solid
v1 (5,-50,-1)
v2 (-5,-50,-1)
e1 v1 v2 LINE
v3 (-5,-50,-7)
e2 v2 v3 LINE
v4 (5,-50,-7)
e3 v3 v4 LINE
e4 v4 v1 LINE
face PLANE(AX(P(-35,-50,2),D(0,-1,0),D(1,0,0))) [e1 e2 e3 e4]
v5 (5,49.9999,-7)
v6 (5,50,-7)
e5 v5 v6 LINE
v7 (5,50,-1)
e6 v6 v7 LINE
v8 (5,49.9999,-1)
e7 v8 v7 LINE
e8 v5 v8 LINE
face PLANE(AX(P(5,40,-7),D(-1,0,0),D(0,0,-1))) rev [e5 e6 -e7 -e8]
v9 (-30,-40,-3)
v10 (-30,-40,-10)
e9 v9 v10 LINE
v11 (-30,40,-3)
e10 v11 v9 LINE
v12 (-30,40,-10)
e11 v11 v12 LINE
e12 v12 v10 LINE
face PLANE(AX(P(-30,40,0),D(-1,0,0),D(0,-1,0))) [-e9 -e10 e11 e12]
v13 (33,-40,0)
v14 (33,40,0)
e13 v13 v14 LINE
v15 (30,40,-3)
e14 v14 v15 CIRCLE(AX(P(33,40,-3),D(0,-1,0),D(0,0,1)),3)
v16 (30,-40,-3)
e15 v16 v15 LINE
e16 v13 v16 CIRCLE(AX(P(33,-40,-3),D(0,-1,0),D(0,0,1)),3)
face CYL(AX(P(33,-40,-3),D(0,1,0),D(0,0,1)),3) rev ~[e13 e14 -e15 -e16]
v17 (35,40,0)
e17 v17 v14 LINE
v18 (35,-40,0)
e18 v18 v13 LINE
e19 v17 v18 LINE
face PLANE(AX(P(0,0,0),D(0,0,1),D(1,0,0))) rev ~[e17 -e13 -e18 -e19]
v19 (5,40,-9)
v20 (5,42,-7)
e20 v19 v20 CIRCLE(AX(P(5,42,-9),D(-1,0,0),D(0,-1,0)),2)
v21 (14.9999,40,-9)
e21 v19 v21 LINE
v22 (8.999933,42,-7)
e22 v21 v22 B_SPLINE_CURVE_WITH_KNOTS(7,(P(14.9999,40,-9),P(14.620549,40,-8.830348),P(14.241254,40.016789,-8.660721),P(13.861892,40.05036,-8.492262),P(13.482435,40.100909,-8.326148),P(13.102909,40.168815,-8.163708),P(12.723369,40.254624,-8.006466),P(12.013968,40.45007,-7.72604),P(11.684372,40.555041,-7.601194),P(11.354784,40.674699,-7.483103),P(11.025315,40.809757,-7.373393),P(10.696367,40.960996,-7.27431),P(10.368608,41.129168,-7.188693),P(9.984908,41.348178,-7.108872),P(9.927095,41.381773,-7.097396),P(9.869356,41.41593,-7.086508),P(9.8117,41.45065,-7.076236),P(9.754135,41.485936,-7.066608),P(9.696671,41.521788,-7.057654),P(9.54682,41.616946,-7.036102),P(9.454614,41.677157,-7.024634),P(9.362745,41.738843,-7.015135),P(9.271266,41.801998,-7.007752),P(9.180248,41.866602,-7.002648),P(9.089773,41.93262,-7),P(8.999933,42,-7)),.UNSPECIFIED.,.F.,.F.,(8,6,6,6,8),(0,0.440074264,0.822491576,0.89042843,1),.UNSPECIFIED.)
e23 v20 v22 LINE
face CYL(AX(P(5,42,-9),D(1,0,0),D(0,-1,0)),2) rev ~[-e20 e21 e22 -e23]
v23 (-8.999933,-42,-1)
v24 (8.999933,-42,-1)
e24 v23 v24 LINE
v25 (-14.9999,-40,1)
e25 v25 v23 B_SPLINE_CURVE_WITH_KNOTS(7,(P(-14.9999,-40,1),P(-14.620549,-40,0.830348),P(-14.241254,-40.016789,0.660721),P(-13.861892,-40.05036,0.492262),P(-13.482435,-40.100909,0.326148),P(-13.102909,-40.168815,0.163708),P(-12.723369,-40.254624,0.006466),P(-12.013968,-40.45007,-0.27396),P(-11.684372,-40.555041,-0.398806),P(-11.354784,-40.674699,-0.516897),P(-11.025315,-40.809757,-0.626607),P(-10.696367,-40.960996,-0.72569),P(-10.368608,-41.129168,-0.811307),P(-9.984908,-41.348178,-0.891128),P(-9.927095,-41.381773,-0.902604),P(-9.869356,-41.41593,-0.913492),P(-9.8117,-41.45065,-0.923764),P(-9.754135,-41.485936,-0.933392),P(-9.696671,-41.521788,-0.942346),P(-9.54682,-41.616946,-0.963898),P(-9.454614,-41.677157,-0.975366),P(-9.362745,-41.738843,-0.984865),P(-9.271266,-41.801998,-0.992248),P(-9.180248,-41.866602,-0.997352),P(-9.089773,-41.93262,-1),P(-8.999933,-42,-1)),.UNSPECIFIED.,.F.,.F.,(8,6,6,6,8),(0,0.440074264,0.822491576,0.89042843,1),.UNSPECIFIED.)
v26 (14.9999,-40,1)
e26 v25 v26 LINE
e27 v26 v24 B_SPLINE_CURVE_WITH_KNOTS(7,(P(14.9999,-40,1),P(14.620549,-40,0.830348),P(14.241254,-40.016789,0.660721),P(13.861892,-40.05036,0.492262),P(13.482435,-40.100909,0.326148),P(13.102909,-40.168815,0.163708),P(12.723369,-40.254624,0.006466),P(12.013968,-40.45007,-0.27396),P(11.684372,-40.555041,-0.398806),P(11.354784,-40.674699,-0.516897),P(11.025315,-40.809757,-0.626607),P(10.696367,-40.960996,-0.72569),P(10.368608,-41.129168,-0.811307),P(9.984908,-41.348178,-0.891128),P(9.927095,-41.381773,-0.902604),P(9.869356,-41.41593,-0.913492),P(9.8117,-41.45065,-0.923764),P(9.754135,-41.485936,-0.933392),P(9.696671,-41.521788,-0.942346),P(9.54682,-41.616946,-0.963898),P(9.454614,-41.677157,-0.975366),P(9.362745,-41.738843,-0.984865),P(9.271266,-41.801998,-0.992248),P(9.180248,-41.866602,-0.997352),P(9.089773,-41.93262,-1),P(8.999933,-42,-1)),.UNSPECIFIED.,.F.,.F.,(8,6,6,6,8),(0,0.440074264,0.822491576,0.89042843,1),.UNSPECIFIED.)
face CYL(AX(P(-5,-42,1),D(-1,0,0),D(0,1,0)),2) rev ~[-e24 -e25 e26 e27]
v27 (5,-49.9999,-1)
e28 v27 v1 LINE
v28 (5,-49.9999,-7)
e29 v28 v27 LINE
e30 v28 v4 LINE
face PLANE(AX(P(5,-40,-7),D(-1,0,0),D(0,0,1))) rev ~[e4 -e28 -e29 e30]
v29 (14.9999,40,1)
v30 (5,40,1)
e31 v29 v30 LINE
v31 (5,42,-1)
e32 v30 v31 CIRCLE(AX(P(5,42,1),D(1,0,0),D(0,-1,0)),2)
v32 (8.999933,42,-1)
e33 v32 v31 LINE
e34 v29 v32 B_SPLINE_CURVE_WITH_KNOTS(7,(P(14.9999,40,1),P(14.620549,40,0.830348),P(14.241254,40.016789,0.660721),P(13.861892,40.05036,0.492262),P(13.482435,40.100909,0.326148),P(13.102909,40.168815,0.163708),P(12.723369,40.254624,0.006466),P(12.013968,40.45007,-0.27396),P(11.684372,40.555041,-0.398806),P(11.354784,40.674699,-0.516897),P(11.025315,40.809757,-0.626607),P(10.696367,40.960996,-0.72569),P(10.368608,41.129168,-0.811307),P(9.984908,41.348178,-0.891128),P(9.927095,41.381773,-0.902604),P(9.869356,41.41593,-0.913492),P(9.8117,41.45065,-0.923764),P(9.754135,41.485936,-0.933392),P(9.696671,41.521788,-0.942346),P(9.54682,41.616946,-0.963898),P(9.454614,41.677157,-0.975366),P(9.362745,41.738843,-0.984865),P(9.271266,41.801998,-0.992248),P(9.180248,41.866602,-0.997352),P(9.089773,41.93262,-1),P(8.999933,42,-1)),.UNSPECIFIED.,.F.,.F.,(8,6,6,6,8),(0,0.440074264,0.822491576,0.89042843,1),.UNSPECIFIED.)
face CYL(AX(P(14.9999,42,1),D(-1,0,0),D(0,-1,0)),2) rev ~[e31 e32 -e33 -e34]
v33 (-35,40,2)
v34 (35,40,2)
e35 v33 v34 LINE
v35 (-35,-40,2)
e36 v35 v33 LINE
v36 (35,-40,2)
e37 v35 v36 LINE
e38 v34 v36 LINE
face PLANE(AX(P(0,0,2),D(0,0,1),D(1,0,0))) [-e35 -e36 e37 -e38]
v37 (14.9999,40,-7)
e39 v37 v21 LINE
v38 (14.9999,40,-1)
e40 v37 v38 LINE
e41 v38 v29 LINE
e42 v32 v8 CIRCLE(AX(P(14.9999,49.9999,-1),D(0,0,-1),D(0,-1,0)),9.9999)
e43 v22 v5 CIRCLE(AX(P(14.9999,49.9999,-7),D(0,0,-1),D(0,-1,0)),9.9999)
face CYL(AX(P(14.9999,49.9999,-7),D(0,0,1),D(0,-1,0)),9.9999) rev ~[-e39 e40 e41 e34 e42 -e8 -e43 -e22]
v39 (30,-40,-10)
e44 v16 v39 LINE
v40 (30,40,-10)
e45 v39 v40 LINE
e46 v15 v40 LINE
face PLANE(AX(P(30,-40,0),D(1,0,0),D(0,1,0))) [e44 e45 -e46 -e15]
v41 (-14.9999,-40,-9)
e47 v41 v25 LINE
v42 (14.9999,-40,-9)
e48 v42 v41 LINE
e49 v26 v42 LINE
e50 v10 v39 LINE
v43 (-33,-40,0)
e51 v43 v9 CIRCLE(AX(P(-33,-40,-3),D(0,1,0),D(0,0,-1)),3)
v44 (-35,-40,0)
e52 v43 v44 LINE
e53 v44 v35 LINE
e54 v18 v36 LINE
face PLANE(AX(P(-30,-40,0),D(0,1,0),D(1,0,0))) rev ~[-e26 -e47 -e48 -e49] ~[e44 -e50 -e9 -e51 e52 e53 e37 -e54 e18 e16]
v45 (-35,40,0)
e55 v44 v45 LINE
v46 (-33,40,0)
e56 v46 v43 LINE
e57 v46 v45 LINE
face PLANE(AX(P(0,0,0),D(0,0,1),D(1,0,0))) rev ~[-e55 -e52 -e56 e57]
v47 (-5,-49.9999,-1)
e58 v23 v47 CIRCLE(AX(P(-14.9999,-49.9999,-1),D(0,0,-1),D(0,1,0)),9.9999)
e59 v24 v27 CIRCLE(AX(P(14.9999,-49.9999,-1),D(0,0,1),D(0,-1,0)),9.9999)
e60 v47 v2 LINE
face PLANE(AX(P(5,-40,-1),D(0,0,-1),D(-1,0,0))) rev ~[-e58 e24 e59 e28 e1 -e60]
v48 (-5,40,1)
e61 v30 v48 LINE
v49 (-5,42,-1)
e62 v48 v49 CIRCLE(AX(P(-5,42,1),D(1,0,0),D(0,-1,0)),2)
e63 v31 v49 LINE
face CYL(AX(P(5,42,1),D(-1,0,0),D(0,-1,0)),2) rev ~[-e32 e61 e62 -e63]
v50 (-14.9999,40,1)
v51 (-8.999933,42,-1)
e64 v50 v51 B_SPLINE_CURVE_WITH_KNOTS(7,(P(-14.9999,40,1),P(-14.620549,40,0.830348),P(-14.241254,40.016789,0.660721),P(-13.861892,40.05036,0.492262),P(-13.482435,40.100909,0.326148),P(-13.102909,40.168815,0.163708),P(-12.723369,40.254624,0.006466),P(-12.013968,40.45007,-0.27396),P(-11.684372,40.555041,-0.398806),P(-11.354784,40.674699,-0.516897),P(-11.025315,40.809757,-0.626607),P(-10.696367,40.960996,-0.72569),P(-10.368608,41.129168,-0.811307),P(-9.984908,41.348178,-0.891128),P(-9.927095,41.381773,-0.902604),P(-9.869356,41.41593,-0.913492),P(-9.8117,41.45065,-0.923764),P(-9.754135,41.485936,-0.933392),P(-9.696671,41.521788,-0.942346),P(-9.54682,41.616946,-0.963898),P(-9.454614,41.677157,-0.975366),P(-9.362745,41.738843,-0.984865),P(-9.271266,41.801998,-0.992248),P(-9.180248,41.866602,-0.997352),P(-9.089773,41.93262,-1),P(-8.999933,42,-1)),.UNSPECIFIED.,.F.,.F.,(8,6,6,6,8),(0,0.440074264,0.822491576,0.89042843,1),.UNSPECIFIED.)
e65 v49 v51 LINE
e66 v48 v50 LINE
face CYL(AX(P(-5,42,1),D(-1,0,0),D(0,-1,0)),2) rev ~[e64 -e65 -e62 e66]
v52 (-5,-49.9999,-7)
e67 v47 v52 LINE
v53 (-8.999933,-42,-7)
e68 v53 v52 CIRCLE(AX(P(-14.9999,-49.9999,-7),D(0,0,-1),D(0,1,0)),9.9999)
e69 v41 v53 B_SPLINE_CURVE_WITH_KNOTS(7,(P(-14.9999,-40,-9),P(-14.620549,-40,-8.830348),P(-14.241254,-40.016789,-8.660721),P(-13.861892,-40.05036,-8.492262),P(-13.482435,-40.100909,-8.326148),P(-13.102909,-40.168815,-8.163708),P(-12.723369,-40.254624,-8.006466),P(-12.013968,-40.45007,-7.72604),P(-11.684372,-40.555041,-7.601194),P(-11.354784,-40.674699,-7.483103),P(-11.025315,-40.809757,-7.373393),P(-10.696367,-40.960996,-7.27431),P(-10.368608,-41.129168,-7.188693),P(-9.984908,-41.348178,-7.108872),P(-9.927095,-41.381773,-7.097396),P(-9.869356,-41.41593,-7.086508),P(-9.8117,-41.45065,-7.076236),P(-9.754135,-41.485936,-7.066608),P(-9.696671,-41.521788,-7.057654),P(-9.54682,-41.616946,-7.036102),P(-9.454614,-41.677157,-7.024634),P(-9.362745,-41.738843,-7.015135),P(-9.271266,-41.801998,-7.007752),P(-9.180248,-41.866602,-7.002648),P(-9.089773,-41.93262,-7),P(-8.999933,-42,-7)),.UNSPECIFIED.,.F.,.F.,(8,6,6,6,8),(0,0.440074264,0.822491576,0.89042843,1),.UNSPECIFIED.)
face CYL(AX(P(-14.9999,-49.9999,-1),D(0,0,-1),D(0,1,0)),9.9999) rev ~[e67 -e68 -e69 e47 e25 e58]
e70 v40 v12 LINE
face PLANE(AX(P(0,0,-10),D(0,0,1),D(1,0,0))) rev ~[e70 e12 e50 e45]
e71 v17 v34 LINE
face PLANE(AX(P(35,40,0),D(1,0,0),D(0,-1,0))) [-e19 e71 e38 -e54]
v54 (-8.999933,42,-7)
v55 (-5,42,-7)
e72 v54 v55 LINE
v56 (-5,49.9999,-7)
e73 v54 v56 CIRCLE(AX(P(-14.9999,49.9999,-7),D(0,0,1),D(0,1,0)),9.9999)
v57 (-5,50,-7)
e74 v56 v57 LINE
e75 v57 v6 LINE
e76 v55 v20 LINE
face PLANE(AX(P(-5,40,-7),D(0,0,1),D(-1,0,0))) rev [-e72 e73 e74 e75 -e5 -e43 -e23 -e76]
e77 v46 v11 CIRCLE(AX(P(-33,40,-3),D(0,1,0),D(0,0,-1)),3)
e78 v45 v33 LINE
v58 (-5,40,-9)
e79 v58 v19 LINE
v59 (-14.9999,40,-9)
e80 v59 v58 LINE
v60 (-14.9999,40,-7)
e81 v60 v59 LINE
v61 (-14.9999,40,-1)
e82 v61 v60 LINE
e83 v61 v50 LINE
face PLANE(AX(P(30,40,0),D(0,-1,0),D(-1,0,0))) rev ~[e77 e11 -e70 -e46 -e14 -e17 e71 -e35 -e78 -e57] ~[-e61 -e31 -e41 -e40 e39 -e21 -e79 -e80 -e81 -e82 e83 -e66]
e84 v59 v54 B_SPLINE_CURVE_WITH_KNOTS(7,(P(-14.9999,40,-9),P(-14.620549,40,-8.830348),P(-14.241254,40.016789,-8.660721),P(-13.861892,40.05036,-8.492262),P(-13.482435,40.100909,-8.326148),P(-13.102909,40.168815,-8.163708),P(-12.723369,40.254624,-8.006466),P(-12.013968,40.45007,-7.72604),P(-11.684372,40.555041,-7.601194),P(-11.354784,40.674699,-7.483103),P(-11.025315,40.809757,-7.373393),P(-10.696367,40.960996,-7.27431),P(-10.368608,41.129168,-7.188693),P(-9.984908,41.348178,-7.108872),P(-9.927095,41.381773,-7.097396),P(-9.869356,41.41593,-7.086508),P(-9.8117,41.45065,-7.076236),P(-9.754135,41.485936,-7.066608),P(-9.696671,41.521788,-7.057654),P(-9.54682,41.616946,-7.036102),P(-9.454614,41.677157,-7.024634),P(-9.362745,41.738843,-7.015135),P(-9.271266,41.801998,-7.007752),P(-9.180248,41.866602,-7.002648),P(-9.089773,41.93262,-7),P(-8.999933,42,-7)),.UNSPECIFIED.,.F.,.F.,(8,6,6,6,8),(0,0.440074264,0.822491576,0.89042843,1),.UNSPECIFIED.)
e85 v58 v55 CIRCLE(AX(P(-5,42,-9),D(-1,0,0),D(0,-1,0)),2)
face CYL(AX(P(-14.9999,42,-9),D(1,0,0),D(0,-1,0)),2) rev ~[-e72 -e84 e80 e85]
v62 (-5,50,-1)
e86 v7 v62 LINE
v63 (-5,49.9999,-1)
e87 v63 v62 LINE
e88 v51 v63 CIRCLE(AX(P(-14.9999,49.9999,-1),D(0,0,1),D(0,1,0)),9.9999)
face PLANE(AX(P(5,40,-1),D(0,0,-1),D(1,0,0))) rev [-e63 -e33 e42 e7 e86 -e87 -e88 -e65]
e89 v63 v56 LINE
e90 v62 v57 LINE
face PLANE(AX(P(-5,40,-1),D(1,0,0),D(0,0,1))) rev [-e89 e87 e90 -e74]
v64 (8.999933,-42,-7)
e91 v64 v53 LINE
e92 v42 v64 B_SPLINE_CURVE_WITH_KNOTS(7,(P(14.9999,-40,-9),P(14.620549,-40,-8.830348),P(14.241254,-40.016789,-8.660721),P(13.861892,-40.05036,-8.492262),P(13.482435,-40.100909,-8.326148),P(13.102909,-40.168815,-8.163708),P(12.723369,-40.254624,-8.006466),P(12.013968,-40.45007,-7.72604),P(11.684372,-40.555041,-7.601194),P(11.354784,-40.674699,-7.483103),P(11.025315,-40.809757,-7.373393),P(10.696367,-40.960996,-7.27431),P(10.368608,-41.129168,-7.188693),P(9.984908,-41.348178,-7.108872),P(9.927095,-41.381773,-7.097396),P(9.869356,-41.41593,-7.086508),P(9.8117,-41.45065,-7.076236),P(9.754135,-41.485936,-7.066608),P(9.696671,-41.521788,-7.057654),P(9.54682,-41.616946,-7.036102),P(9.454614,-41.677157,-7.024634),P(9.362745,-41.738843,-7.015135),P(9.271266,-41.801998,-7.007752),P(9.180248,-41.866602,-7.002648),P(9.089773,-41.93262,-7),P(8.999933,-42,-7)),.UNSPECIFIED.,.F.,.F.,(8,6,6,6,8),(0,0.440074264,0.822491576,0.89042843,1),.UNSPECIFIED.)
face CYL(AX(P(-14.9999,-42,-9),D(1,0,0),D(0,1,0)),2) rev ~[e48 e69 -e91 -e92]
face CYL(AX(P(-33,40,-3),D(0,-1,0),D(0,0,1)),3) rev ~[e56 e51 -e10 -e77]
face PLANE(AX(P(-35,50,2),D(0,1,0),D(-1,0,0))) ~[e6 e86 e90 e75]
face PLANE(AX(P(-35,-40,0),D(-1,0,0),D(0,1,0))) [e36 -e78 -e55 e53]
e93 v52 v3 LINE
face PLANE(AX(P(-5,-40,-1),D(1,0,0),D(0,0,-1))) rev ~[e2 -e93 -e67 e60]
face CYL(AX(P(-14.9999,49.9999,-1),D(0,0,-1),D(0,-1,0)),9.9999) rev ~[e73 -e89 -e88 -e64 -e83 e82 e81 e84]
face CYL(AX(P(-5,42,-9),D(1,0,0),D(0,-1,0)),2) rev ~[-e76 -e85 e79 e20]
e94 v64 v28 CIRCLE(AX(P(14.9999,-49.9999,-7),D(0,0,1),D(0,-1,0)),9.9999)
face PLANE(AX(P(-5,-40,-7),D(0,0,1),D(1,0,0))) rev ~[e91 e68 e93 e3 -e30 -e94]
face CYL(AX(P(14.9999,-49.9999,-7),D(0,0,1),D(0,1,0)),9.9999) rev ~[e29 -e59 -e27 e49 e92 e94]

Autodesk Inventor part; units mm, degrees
ref_plane "YZ Plane" through (0, 0, 0) normal (1, 0, 0) x (0, 1, 0)
ref_plane "XZ Plane" through (0, 0, 0) normal (0, 1, 0) x (-1, 0, 0)
ref_plane "XY Plane" through (0, 0, 0) normal (0, 0, 1) x (1, 0, 0)
sketch "Esboço1" plane through (0, 0, 0) normal (0, 0, 1) x (1, 0, 0)
  line L0 (-30, -40) -> (30, -40)
  line L1 (30, -40) -> (30, 40)
  line L2 (30, 40) -> (-30, 40)
  line L3 (-30, 40) -> (-30, -40)
  line L4 (-30, -40) -> (30, 40) construction
  line L5 (30, -40) -> (-30, 40) construction
  line L6 (35, 40) -> (35, -40)
  line L7 (-35, -40) -> (-35, 40)
  line L8 (30, -40) -> (35, -40)
  line L9 (-35, -40) -> (-30, -40)
  line L10 (-35, 40) -> (-30, 40)
  line L11 (30, 40) -> (35, 40)
  point P0 (0, 0)
  dimension "d0" = 60
  dimension "d1" = 80
  dimension "d2" = 5
  dimension "d3" = 5
extrude "Extrusão1" add sketch "Esboço1" along normal blind 2
extrude "Extrusão2" add sketch "Esboço1" against normal blind 10 contours L3 L2 L1 L0
fillet "Arredondamento1" radius 3 2 edges at (30, 0, 0) (-30, 0, 0)
sketch "Esboço2" plane through (-35, -40, 2) normal (0, -1, 0) x (1, 0, 0)
  line L0 (65, -12) -> (5, -12) projected
  line L1 (65, -12) -> (65, 0)
  line L2 (0, 0) -> (70, 0) projected
  line L3 (65, -6) -> (5, -6) construction
  line L4 (5, -5) -> (5, -12) projected
  line L5 (40, -3) -> (30, -3)
  line L6 (30, -3) -> (30, -9)
  line L7 (30, -9) -> (40, -9)
  line L8 (40, -9) -> (40, -3)
  line L9 (40, -3) -> (30, -9) construction
  line L10 (30, -3) -> (40, -9) construction
  point P0 (35, -2)
  point P1 (35, -6)
  dimension "d9" = 10
  dimension "d10" = 6
extrude "Extrusão3" add sketch "Esboço2" along normal blind 10
fillet "Arredondamento2" radius 10 2 edges at (5, -40, -4) (-5, -40, -4)
fillet "Arredondamento3" radius 2 2 edges at (0, -40, -7) (0, -40, -1)
mirror "Espelhar1" about plane through (0, 0, 0) normal (0, 1, 0) of "Arredondamento2", "Extrusão3", "Arredondamento3"
properties part number "Repetidor"
